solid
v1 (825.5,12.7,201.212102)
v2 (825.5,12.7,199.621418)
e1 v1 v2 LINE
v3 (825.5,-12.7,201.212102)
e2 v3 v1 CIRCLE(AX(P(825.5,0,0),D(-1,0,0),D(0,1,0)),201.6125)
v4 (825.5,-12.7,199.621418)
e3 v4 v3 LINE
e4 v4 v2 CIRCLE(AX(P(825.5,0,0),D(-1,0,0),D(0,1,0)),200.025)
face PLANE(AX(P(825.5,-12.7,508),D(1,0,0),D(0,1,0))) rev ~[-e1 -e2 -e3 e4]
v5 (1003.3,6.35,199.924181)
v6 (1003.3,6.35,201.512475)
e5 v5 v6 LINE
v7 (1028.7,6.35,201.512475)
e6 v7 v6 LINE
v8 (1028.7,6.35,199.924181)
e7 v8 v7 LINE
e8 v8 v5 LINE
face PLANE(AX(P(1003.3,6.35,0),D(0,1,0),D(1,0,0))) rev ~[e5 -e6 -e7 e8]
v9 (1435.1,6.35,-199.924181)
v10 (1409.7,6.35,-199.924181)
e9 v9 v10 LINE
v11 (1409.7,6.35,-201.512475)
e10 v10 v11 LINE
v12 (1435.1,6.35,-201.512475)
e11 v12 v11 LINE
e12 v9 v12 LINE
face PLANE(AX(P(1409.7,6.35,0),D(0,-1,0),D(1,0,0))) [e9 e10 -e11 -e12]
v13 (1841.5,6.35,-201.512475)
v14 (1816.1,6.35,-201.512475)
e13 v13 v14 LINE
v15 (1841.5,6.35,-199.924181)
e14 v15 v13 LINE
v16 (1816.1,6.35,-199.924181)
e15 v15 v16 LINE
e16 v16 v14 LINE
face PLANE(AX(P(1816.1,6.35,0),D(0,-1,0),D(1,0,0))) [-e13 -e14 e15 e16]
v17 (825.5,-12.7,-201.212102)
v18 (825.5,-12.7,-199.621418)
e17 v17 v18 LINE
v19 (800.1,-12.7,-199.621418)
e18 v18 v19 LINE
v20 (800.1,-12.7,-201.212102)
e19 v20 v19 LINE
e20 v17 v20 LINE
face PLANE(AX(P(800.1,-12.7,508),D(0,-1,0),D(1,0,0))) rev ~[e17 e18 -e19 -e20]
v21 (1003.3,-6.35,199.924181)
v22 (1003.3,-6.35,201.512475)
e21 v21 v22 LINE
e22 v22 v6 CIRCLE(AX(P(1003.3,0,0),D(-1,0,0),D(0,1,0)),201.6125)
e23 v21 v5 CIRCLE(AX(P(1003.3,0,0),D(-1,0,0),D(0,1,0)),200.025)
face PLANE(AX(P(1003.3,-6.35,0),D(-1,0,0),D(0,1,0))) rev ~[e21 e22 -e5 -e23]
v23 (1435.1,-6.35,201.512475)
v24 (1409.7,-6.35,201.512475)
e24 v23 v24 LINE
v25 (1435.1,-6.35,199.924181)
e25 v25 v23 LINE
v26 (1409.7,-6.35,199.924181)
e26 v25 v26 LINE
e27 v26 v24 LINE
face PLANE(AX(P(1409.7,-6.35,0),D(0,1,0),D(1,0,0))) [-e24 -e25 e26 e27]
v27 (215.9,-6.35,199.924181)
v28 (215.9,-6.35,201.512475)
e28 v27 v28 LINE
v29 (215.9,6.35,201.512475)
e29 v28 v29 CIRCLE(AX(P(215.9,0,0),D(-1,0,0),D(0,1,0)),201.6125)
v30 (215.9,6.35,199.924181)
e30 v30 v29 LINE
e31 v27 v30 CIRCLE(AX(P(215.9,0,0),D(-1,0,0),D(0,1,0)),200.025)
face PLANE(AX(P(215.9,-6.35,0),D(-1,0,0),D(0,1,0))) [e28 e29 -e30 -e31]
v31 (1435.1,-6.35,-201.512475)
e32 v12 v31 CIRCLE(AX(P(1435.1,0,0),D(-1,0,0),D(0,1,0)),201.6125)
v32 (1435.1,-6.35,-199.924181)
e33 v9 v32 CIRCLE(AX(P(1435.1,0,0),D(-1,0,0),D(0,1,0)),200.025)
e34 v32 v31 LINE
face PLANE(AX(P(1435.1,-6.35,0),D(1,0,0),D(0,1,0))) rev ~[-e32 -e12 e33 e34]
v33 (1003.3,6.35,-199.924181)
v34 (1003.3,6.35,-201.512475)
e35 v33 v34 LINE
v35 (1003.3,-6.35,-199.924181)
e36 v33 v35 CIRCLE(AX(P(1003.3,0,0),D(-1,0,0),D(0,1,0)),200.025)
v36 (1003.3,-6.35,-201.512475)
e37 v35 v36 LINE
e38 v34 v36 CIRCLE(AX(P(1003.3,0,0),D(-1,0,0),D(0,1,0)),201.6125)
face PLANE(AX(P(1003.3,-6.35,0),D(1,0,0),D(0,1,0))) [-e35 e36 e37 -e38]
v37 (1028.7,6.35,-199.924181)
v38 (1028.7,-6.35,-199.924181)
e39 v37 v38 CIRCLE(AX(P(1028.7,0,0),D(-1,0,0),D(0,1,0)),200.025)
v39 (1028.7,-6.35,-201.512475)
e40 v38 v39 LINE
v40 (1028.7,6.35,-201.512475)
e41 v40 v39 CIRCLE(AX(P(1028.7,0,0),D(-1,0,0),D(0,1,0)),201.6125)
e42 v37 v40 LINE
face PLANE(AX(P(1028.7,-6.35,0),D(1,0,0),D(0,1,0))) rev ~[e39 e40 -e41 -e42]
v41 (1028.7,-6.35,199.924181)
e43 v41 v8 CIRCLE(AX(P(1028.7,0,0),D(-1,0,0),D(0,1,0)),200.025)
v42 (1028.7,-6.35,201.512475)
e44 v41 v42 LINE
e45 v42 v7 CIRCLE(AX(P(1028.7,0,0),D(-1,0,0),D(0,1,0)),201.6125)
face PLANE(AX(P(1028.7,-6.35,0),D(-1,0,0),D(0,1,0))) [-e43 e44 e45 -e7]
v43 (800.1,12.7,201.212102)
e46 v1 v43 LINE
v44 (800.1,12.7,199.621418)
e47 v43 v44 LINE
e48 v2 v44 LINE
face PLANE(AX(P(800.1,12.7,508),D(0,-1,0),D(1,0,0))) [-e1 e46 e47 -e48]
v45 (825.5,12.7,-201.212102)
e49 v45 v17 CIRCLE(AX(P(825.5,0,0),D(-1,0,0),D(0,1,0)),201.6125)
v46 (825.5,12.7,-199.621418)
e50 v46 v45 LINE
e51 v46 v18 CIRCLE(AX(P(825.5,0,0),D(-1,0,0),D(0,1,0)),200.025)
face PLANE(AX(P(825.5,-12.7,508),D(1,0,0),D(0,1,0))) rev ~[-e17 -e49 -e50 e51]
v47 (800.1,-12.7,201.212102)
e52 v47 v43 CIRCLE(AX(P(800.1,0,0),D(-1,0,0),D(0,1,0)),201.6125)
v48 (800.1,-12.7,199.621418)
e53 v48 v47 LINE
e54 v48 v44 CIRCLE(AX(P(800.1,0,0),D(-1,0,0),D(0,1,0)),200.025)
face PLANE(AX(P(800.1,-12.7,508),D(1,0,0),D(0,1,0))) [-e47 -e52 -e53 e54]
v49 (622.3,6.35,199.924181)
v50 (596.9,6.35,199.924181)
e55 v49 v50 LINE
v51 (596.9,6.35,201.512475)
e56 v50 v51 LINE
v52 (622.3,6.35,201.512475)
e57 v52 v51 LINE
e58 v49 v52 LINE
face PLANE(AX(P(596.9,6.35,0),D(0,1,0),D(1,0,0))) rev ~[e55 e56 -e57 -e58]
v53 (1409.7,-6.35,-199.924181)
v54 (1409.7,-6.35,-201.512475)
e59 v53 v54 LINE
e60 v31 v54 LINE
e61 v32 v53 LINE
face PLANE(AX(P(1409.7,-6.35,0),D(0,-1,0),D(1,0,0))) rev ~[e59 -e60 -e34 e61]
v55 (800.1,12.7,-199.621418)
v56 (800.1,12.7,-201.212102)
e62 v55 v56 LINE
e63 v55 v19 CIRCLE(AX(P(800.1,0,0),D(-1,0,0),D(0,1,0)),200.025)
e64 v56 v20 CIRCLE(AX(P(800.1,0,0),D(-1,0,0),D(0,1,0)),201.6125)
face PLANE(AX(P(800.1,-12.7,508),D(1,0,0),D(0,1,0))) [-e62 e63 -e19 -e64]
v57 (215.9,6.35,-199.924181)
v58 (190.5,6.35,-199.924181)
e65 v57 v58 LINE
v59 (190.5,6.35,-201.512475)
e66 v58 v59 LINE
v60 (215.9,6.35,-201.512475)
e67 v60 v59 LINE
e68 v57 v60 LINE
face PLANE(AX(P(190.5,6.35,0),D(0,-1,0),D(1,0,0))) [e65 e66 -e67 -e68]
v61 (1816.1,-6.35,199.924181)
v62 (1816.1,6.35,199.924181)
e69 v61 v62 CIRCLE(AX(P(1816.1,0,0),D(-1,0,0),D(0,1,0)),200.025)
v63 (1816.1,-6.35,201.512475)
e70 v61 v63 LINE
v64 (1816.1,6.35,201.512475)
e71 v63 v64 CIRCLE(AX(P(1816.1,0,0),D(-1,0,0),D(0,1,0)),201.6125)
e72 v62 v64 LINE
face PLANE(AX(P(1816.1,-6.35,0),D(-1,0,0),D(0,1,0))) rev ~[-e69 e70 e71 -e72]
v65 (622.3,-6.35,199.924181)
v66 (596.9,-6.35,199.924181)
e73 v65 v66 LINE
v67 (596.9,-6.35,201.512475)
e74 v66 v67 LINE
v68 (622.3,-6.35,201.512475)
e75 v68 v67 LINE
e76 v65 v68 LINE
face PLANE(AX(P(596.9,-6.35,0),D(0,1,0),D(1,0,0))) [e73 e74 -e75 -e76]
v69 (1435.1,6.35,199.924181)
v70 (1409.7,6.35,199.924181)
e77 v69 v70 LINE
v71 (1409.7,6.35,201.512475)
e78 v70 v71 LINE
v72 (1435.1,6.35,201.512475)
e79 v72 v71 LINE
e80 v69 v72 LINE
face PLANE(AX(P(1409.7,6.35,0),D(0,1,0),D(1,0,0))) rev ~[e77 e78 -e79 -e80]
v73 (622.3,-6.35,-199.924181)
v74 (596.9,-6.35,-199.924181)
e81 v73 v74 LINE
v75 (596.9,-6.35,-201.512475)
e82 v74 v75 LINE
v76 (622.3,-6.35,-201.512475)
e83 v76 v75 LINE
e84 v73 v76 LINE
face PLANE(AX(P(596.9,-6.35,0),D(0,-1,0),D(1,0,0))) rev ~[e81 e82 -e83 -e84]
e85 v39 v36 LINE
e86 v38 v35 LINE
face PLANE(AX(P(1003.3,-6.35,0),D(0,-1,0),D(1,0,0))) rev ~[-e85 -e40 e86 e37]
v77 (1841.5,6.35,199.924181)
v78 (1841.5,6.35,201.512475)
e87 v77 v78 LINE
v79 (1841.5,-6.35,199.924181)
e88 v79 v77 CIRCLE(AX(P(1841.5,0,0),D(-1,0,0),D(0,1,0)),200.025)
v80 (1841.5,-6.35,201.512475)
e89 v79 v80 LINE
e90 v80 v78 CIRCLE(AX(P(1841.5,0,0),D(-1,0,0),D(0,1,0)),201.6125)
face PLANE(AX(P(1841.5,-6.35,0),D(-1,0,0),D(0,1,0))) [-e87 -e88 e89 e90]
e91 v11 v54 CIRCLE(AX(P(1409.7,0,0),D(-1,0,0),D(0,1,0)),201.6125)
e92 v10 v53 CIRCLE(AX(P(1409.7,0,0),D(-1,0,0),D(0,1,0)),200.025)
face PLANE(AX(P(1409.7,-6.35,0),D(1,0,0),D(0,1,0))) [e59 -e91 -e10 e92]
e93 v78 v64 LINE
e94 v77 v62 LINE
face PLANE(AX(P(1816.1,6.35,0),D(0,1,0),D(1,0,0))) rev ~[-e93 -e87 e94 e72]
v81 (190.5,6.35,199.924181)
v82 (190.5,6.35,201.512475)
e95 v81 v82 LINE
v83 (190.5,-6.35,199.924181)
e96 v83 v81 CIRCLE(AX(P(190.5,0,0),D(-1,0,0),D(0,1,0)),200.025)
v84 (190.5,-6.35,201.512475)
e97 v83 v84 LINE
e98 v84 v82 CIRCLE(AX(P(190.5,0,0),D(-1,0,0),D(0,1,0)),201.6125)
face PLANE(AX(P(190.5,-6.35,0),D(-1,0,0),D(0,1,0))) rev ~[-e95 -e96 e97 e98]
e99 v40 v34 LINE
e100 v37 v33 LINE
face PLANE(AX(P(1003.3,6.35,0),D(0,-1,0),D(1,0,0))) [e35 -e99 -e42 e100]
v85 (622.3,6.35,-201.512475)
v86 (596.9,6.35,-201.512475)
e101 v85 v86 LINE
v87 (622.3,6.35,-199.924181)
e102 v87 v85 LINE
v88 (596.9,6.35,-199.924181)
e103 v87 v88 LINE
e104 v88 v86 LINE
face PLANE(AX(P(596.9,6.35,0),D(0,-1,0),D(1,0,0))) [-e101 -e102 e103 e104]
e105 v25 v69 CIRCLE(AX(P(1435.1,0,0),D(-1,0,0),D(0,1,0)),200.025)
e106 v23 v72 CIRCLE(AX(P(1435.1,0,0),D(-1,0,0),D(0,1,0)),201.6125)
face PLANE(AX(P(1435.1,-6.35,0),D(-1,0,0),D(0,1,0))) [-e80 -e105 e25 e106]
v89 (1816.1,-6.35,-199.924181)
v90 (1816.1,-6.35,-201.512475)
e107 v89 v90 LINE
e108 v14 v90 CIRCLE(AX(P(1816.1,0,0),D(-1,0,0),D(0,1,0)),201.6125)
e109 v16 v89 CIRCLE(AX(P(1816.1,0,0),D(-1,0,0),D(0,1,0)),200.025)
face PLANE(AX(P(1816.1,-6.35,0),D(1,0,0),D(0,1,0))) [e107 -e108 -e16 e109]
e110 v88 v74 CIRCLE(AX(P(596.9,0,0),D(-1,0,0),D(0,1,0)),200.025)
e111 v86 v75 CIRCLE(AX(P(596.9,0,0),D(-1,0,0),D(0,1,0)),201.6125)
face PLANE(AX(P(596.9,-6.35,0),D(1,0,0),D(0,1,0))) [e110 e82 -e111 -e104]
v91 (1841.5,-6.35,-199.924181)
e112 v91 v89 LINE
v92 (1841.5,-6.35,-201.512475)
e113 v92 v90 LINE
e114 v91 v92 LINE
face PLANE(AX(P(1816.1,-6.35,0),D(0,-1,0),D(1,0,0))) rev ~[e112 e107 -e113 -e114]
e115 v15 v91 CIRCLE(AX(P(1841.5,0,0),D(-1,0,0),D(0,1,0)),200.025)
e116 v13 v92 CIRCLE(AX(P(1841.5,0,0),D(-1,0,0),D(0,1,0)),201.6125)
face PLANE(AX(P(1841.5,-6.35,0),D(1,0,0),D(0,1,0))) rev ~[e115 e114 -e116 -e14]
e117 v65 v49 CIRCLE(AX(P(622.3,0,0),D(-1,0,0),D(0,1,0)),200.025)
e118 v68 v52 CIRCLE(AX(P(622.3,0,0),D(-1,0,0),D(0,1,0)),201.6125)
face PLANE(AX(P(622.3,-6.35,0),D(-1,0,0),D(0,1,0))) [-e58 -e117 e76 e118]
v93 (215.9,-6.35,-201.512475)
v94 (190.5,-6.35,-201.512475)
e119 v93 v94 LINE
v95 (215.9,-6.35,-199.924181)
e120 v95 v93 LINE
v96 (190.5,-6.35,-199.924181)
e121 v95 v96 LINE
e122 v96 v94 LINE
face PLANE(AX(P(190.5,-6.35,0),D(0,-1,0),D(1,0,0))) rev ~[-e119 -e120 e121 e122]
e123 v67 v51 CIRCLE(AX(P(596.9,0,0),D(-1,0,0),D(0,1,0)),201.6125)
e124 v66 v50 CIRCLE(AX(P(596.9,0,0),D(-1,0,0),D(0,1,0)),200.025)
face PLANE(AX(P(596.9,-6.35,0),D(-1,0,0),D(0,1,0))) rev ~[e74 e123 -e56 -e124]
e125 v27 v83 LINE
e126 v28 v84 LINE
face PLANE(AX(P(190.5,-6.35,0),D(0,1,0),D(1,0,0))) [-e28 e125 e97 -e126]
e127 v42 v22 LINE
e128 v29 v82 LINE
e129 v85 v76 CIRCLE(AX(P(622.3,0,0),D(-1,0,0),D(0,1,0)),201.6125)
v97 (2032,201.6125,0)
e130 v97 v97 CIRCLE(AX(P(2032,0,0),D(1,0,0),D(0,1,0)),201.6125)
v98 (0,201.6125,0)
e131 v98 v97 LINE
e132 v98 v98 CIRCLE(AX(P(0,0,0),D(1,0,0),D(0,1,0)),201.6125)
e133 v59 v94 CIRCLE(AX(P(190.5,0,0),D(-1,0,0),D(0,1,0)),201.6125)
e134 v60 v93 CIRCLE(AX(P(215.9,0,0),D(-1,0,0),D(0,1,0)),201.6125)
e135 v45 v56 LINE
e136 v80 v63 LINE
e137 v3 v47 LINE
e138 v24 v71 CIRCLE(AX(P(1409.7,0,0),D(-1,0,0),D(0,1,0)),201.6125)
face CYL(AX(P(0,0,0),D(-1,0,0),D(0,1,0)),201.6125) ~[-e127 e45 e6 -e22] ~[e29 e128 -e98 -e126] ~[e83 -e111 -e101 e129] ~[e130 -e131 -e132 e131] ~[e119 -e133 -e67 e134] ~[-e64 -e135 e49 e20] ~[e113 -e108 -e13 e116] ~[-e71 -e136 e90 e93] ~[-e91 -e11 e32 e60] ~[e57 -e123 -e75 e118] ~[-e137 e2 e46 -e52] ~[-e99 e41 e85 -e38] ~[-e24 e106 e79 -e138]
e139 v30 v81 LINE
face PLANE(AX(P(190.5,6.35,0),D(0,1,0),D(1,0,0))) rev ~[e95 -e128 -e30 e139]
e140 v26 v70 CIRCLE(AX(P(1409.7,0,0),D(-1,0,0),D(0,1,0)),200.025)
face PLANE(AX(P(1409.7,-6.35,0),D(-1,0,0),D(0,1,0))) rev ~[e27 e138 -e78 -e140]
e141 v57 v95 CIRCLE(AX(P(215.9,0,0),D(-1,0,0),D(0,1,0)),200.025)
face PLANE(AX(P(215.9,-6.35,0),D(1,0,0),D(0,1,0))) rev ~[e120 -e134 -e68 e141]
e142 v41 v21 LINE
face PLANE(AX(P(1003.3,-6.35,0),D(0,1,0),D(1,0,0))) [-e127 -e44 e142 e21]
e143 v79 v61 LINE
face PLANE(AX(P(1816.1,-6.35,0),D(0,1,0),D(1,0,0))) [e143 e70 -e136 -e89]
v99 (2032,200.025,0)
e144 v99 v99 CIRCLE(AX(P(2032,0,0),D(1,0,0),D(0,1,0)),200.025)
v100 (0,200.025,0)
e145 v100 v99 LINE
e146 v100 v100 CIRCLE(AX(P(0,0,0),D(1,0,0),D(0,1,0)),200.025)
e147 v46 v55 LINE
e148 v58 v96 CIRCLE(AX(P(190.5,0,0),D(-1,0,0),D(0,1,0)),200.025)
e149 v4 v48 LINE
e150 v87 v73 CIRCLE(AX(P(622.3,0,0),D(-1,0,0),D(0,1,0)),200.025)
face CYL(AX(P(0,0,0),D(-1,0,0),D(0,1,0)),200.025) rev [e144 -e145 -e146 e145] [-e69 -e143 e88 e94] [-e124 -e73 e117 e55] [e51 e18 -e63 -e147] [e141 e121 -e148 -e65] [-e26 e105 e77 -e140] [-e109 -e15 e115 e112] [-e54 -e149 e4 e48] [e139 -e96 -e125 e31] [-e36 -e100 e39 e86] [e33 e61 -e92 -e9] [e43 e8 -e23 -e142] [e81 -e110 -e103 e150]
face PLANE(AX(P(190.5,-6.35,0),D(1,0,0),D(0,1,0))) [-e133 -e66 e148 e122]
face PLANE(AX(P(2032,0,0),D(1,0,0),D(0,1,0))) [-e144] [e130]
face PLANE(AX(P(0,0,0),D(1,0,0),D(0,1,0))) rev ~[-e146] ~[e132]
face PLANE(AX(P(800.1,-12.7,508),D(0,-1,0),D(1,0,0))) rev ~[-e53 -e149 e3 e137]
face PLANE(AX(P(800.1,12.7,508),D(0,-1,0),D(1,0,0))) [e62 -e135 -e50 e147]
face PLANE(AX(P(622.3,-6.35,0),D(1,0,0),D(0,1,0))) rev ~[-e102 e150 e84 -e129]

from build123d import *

# Parameters (mm, degrees)
F0_R          = 201.6125
F0_R_2        = 200.025
F1_DEPTH      = 2032
F2_W          = 25.4
F2_H          = 25.4
F3_DEPTH      = 508
F4_DEPTH      = 2714
F4_DEPTH_BACK = 709.6135
F5_W          = 25.4
F5_H          = 12.7
F6_DEPTH      = 201.6135
F6_DEPTH_BACK = 201.6135


# Not quite as in the source:
# - an extrude ends at something that could not be found from the text; its depth is read off the source's solid


with BuildPart() as f1:
    # F0 (on Right) → F1 (new body)
    with BuildSketch(Plane.YZ):
        Circle(F0_R)
        Circle(F0_R_2, mode=Mode.SUBTRACT)
    extrude(amount=F1_DEPTH)


with BuildPart() as f3:
    # F2 (on Top) → F3 (new body)
    with BuildSketch(Plane.XY):
        with Locations((812.8, 0)):
            Rectangle(F2_W, F2_H)
    extrude(amount=F3_DEPTH)


with BuildPart() as f4_tool:
    # F4 (cut, two sides): a face of the model
    f4_faces = [f3.part.faces().sort_by_distance(p)[0] for p in [
        (812.8, 0, 508),
    ]]
    extrude(f4_faces, amount=F4_DEPTH)
    extrude(f4_faces, amount=-F4_DEPTH_BACK)


with BuildPart() as f1_1:
    add(f1.part)

    # F4: cut by f4_tool
    add(f4_tool.part, mode=Mode.SUBTRACT)

    # F5 (on Top) → F6 (cut, two sides)
    with BuildSketch(Plane.XY) as f6_sk:
        with Locations((203.2, 0)):
            Rectangle(F5_W, F5_H)
        with Locations((609.6, 0)):
            Rectangle(F5_W, F5_H)
        with Locations((1016, 0)):
            Rectangle(F5_W, F5_H)
        with Locations((1422.4, 0)):
            Rectangle(F5_W, F5_H)
        with Locations((1828.8, 0)):
            Rectangle(F5_W, F5_H)
    extrude(amount=F6_DEPTH, mode=Mode.SUBTRACT)
    extrude(f6_sk.sketch, amount=-F6_DEPTH_BACK, mode=Mode.SUBTRACT)


with BuildPart() as f3_1:
    add(f3.part)

    # F4: cut by f4_tool
    add(f4_tool.part, mode=Mode.SUBTRACT)


solid = f1_1.part
